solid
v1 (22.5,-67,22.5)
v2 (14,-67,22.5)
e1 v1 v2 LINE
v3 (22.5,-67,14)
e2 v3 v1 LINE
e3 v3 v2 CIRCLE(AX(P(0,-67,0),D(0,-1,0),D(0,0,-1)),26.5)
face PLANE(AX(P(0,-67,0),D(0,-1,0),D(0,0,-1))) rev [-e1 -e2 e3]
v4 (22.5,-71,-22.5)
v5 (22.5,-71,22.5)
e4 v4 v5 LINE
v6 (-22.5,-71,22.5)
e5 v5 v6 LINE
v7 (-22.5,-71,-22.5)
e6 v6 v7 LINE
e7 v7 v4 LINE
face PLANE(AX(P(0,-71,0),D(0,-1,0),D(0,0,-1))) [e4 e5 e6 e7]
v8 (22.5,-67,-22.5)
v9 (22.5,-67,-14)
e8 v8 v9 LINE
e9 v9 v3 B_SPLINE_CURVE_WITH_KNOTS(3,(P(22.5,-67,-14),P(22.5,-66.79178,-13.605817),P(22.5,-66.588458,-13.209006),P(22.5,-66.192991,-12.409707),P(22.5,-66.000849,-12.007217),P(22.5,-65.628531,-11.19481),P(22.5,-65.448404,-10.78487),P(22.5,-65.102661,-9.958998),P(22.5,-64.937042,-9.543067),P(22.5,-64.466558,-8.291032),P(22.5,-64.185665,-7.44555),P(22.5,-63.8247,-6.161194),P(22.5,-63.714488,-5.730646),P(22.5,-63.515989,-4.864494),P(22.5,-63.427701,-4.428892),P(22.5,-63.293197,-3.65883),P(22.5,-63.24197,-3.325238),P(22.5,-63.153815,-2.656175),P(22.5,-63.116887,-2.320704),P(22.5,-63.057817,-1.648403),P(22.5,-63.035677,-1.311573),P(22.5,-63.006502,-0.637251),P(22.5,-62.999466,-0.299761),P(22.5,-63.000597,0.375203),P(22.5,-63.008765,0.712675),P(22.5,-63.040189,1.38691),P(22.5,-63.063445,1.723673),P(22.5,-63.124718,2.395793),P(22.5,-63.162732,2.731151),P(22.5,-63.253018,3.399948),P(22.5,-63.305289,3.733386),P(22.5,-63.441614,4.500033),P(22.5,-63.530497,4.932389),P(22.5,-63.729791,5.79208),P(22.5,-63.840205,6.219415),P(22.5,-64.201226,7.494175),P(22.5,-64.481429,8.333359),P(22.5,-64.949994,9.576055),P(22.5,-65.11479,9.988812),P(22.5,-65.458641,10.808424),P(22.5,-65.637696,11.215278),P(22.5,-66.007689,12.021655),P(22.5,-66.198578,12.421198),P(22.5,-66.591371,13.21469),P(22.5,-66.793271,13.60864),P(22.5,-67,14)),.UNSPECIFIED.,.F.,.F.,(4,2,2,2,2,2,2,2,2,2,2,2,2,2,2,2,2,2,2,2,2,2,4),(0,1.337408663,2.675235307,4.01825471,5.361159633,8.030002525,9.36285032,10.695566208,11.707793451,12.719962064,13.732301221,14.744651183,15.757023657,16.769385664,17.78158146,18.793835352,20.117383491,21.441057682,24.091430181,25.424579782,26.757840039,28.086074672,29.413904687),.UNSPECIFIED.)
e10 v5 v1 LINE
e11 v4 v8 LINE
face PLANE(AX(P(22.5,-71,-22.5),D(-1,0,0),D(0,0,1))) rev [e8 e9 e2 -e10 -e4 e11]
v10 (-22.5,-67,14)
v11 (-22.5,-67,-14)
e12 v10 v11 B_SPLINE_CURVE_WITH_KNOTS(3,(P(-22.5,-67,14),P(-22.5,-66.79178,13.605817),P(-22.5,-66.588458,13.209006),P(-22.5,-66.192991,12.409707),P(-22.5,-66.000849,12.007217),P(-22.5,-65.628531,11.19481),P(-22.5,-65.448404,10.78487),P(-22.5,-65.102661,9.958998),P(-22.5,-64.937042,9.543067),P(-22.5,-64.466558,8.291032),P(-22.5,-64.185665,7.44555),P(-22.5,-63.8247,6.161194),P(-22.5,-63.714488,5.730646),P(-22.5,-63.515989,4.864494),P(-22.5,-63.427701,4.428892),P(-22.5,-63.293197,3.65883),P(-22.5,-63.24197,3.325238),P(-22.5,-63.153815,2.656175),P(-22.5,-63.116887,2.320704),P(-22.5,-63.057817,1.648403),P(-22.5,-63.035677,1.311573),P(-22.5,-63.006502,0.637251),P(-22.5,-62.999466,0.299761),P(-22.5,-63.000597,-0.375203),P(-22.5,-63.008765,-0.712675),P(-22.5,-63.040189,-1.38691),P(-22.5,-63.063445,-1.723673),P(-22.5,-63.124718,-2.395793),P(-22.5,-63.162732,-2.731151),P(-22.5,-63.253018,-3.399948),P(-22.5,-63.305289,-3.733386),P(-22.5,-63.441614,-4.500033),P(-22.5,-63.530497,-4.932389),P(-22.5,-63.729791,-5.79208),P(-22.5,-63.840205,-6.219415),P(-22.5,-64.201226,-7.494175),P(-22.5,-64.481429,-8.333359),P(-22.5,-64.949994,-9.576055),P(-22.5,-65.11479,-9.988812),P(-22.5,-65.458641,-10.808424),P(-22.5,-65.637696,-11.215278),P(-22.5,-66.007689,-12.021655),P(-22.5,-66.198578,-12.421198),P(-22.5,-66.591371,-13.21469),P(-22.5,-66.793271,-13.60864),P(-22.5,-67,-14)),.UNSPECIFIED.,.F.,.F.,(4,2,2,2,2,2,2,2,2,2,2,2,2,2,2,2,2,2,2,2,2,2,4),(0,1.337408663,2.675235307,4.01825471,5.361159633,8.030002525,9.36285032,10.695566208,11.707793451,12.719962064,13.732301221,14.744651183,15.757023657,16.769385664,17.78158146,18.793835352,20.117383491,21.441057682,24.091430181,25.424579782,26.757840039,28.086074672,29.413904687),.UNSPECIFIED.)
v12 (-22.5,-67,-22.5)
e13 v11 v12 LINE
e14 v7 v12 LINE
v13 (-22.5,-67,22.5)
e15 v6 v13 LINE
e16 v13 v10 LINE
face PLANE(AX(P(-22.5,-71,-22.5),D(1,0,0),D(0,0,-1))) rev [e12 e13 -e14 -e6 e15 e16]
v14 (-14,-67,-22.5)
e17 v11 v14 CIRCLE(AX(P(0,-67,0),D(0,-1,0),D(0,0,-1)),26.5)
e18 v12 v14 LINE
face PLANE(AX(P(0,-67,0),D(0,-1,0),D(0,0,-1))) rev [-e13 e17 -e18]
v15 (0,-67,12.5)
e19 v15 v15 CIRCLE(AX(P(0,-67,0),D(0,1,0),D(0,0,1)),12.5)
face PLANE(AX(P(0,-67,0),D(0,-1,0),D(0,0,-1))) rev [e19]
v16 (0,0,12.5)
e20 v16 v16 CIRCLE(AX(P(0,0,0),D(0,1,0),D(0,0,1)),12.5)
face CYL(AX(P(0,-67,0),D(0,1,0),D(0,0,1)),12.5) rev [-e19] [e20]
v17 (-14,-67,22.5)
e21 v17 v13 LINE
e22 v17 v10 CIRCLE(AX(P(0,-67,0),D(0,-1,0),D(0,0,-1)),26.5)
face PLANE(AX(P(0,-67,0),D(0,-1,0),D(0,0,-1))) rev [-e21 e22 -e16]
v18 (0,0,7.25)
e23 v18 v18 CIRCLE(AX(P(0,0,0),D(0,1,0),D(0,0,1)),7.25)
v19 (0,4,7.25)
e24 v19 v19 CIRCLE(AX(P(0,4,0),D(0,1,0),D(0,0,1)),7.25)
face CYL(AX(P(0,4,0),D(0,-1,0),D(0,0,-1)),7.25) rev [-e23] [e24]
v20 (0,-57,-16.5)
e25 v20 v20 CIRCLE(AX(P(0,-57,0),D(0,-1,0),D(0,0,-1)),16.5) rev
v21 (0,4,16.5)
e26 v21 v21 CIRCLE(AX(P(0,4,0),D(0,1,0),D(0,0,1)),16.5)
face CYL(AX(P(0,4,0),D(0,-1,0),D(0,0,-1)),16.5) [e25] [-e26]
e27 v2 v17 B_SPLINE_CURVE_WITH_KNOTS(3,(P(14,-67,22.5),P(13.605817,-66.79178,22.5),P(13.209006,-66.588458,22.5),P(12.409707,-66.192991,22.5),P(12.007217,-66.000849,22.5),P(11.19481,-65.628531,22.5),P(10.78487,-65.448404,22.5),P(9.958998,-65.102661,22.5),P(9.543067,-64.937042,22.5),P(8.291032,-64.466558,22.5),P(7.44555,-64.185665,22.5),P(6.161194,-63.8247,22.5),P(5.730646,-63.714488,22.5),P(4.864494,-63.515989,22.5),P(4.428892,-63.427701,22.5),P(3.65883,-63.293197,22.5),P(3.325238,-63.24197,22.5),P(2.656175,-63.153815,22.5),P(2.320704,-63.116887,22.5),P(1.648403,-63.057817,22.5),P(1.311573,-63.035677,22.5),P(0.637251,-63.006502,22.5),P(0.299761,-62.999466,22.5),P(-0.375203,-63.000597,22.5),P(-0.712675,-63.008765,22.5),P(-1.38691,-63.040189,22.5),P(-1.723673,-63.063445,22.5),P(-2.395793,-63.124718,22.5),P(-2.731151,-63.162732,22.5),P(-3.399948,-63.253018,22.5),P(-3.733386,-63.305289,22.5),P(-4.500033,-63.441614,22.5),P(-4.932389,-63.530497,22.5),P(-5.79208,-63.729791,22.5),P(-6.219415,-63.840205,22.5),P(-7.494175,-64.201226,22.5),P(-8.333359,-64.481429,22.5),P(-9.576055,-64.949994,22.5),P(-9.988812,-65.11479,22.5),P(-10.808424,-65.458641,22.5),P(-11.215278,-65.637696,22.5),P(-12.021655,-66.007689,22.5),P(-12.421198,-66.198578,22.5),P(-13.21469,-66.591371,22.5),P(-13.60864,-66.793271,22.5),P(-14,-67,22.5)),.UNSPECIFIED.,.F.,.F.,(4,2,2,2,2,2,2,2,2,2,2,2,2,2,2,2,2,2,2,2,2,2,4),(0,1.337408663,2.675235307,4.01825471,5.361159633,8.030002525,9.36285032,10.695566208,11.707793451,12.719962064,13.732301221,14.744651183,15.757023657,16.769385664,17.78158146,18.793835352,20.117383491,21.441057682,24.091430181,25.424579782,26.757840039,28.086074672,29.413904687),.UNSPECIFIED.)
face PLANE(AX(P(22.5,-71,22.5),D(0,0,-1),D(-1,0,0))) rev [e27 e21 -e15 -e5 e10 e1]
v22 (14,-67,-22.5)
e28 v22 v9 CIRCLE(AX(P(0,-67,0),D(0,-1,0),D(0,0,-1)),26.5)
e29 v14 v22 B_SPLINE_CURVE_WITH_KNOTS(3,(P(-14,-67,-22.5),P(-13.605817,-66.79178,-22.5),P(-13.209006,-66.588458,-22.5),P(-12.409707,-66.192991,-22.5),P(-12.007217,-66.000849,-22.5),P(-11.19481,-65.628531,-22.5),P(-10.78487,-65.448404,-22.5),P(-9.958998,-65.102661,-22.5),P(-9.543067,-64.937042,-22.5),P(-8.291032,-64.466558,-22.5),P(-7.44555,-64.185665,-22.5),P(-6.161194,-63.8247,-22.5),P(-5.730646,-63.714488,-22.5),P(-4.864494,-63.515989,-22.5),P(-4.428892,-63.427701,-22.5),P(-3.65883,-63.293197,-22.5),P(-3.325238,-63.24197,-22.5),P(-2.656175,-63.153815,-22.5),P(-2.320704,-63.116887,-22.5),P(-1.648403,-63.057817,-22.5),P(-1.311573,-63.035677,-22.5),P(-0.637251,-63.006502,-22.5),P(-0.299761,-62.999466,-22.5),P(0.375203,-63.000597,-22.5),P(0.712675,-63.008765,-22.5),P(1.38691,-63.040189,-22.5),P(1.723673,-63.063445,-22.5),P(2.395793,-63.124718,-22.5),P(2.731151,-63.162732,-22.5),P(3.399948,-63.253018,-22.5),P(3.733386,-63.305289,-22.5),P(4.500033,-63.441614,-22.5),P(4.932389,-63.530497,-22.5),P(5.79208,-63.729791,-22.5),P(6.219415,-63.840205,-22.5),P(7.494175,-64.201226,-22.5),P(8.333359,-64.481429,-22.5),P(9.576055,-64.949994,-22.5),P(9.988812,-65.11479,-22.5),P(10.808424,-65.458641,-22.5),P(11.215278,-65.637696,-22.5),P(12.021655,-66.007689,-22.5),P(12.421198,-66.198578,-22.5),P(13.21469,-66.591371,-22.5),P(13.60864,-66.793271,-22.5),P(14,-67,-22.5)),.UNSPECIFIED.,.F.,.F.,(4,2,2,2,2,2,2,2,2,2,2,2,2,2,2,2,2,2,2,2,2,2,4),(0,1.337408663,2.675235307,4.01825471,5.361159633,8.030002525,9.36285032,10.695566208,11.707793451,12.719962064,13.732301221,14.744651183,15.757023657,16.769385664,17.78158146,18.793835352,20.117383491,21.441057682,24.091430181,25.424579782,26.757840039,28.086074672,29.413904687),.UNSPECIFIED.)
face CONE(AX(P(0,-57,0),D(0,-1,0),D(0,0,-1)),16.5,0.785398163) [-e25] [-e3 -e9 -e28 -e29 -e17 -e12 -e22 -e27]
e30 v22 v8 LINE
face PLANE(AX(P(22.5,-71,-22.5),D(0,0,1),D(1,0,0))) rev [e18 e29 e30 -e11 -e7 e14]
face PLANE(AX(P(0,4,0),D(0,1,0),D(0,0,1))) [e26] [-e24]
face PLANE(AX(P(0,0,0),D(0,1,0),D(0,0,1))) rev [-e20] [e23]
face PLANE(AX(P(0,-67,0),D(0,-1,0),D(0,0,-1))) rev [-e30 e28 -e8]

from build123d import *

# Parameters (mm, degrees)
SKETCH2_R           = 16.5
SKETCH2_R_2         = 12.5
SKETCH2_R_3         = 7.25
BOSS_EXTRUDE1_DEPTH = 4
BOSS_EXTRUDE3_START = -67
SKETCH2_4_R         = 16.5
SKETCH2_4_R_2       = 12.5
BOSS_EXTRUDE3_DEPTH = 67
SKETCH3_W           = 45
SKETCH3_H           = 45
BOSS_EXTRUDE4_DEPTH = 4
CHAMFER1_SIZE       = 10


with BuildPart() as part:
    # Sketch2 → Boss-Extrude1 (new body)
    # profile 1 of 2: a face of its own
    with BuildSketch(Plane(origin=(0, 0, 0), x_dir=(1, 0, 0), z_dir=(0, 1, 0))):
        with Locations(Location((0, 0, 0), (0, 0, 270))):
            Circle(SKETCH2_R)
        Circle(SKETCH2_R_2, mode=Mode.SUBTRACT)
    # profile 2 of 2: a face of its own
    with BuildSketch(Plane(origin=(0, 0, 0), x_dir=(1, 0, 0), z_dir=(0, 1, 0))):
        Circle(SKETCH2_R_2)
        with Locations(Location((0, 0, 0), (0, 0, 270))):
            Circle(SKETCH2_R_3, mode=Mode.SUBTRACT)
    extrude(amount=BOSS_EXTRUDE1_DEPTH)

    # Sketch2<4> → Boss-Extrude3 (add)
    with BuildSketch(Plane(origin=(0, 0, 0), x_dir=(1, 0, 0), z_dir=(0, 1, 0)).offset(BOSS_EXTRUDE3_START)):
        with Locations(Location((0, 0, 0), (0, 0, 270))):
            Circle(SKETCH2_4_R)
        with Locations(Location((0, 0, 0), (0, 0, 270))):
            Circle(SKETCH2_4_R_2, mode=Mode.SUBTRACT)
    extrude(amount=BOSS_EXTRUDE3_DEPTH)

    # Sketch3 → Boss-Extrude4 (add)
    with BuildSketch(Plane(origin=(0, -67, 0), x_dir=(-1, 0, 0), z_dir=(0, -1, 0))):
        Rectangle(SKETCH3_W, SKETCH3_H)
    extrude(amount=BOSS_EXTRUDE4_DEPTH)

    # Chamfer1
    # the kernel refuses this chamfer: 10 mm, written as the material it adds along each edge
    with BuildSketch(Plane(origin=(0, -67, 0), x_dir=(0, 0, 1), z_dir=(-1, 0, 0))) as chamfer1_piece_1_section:
        Polygon((16.5 + CHAMFER1_SIZE, 0), (16.5, CHAMFER1_SIZE), (16.5, 0), align=None)
    chamfer1_piece_1 = revolve(axis=Axis((0, -67, 0), (0, 1, 0)), mode=Mode.PRIVATE)
    chamfer1_piece_1 = split(chamfer1_piece_1, bisect_by=Plane(origin=(0, -62.130236746, -22.5), z_dir=(0, 0, 1)), keep=Keep.TOP, mode=Mode.PRIVATE)
    chamfer1_piece_1 = split(chamfer1_piece_1, bisect_by=Plane(origin=(22.5, -62.130236746, -21.369763254), z_dir=(-1, 0, 0)), keep=Keep.TOP, mode=Mode.PRIVATE)
    chamfer1_piece_1 = split(chamfer1_piece_1, bisect_by=Plane(origin=(-22.5, -62.130236746, -21.369763254), z_dir=(1, 0, 0)), keep=Keep.TOP, mode=Mode.PRIVATE)
    chamfer1_piece_1 = split(chamfer1_piece_1, bisect_by=Plane(origin=(0, -62.130236746, 22.5), z_dir=(0, 0, -1)), keep=Keep.TOP, mode=Mode.PRIVATE)
    add(chamfer1_piece_1)


solid = part.part
